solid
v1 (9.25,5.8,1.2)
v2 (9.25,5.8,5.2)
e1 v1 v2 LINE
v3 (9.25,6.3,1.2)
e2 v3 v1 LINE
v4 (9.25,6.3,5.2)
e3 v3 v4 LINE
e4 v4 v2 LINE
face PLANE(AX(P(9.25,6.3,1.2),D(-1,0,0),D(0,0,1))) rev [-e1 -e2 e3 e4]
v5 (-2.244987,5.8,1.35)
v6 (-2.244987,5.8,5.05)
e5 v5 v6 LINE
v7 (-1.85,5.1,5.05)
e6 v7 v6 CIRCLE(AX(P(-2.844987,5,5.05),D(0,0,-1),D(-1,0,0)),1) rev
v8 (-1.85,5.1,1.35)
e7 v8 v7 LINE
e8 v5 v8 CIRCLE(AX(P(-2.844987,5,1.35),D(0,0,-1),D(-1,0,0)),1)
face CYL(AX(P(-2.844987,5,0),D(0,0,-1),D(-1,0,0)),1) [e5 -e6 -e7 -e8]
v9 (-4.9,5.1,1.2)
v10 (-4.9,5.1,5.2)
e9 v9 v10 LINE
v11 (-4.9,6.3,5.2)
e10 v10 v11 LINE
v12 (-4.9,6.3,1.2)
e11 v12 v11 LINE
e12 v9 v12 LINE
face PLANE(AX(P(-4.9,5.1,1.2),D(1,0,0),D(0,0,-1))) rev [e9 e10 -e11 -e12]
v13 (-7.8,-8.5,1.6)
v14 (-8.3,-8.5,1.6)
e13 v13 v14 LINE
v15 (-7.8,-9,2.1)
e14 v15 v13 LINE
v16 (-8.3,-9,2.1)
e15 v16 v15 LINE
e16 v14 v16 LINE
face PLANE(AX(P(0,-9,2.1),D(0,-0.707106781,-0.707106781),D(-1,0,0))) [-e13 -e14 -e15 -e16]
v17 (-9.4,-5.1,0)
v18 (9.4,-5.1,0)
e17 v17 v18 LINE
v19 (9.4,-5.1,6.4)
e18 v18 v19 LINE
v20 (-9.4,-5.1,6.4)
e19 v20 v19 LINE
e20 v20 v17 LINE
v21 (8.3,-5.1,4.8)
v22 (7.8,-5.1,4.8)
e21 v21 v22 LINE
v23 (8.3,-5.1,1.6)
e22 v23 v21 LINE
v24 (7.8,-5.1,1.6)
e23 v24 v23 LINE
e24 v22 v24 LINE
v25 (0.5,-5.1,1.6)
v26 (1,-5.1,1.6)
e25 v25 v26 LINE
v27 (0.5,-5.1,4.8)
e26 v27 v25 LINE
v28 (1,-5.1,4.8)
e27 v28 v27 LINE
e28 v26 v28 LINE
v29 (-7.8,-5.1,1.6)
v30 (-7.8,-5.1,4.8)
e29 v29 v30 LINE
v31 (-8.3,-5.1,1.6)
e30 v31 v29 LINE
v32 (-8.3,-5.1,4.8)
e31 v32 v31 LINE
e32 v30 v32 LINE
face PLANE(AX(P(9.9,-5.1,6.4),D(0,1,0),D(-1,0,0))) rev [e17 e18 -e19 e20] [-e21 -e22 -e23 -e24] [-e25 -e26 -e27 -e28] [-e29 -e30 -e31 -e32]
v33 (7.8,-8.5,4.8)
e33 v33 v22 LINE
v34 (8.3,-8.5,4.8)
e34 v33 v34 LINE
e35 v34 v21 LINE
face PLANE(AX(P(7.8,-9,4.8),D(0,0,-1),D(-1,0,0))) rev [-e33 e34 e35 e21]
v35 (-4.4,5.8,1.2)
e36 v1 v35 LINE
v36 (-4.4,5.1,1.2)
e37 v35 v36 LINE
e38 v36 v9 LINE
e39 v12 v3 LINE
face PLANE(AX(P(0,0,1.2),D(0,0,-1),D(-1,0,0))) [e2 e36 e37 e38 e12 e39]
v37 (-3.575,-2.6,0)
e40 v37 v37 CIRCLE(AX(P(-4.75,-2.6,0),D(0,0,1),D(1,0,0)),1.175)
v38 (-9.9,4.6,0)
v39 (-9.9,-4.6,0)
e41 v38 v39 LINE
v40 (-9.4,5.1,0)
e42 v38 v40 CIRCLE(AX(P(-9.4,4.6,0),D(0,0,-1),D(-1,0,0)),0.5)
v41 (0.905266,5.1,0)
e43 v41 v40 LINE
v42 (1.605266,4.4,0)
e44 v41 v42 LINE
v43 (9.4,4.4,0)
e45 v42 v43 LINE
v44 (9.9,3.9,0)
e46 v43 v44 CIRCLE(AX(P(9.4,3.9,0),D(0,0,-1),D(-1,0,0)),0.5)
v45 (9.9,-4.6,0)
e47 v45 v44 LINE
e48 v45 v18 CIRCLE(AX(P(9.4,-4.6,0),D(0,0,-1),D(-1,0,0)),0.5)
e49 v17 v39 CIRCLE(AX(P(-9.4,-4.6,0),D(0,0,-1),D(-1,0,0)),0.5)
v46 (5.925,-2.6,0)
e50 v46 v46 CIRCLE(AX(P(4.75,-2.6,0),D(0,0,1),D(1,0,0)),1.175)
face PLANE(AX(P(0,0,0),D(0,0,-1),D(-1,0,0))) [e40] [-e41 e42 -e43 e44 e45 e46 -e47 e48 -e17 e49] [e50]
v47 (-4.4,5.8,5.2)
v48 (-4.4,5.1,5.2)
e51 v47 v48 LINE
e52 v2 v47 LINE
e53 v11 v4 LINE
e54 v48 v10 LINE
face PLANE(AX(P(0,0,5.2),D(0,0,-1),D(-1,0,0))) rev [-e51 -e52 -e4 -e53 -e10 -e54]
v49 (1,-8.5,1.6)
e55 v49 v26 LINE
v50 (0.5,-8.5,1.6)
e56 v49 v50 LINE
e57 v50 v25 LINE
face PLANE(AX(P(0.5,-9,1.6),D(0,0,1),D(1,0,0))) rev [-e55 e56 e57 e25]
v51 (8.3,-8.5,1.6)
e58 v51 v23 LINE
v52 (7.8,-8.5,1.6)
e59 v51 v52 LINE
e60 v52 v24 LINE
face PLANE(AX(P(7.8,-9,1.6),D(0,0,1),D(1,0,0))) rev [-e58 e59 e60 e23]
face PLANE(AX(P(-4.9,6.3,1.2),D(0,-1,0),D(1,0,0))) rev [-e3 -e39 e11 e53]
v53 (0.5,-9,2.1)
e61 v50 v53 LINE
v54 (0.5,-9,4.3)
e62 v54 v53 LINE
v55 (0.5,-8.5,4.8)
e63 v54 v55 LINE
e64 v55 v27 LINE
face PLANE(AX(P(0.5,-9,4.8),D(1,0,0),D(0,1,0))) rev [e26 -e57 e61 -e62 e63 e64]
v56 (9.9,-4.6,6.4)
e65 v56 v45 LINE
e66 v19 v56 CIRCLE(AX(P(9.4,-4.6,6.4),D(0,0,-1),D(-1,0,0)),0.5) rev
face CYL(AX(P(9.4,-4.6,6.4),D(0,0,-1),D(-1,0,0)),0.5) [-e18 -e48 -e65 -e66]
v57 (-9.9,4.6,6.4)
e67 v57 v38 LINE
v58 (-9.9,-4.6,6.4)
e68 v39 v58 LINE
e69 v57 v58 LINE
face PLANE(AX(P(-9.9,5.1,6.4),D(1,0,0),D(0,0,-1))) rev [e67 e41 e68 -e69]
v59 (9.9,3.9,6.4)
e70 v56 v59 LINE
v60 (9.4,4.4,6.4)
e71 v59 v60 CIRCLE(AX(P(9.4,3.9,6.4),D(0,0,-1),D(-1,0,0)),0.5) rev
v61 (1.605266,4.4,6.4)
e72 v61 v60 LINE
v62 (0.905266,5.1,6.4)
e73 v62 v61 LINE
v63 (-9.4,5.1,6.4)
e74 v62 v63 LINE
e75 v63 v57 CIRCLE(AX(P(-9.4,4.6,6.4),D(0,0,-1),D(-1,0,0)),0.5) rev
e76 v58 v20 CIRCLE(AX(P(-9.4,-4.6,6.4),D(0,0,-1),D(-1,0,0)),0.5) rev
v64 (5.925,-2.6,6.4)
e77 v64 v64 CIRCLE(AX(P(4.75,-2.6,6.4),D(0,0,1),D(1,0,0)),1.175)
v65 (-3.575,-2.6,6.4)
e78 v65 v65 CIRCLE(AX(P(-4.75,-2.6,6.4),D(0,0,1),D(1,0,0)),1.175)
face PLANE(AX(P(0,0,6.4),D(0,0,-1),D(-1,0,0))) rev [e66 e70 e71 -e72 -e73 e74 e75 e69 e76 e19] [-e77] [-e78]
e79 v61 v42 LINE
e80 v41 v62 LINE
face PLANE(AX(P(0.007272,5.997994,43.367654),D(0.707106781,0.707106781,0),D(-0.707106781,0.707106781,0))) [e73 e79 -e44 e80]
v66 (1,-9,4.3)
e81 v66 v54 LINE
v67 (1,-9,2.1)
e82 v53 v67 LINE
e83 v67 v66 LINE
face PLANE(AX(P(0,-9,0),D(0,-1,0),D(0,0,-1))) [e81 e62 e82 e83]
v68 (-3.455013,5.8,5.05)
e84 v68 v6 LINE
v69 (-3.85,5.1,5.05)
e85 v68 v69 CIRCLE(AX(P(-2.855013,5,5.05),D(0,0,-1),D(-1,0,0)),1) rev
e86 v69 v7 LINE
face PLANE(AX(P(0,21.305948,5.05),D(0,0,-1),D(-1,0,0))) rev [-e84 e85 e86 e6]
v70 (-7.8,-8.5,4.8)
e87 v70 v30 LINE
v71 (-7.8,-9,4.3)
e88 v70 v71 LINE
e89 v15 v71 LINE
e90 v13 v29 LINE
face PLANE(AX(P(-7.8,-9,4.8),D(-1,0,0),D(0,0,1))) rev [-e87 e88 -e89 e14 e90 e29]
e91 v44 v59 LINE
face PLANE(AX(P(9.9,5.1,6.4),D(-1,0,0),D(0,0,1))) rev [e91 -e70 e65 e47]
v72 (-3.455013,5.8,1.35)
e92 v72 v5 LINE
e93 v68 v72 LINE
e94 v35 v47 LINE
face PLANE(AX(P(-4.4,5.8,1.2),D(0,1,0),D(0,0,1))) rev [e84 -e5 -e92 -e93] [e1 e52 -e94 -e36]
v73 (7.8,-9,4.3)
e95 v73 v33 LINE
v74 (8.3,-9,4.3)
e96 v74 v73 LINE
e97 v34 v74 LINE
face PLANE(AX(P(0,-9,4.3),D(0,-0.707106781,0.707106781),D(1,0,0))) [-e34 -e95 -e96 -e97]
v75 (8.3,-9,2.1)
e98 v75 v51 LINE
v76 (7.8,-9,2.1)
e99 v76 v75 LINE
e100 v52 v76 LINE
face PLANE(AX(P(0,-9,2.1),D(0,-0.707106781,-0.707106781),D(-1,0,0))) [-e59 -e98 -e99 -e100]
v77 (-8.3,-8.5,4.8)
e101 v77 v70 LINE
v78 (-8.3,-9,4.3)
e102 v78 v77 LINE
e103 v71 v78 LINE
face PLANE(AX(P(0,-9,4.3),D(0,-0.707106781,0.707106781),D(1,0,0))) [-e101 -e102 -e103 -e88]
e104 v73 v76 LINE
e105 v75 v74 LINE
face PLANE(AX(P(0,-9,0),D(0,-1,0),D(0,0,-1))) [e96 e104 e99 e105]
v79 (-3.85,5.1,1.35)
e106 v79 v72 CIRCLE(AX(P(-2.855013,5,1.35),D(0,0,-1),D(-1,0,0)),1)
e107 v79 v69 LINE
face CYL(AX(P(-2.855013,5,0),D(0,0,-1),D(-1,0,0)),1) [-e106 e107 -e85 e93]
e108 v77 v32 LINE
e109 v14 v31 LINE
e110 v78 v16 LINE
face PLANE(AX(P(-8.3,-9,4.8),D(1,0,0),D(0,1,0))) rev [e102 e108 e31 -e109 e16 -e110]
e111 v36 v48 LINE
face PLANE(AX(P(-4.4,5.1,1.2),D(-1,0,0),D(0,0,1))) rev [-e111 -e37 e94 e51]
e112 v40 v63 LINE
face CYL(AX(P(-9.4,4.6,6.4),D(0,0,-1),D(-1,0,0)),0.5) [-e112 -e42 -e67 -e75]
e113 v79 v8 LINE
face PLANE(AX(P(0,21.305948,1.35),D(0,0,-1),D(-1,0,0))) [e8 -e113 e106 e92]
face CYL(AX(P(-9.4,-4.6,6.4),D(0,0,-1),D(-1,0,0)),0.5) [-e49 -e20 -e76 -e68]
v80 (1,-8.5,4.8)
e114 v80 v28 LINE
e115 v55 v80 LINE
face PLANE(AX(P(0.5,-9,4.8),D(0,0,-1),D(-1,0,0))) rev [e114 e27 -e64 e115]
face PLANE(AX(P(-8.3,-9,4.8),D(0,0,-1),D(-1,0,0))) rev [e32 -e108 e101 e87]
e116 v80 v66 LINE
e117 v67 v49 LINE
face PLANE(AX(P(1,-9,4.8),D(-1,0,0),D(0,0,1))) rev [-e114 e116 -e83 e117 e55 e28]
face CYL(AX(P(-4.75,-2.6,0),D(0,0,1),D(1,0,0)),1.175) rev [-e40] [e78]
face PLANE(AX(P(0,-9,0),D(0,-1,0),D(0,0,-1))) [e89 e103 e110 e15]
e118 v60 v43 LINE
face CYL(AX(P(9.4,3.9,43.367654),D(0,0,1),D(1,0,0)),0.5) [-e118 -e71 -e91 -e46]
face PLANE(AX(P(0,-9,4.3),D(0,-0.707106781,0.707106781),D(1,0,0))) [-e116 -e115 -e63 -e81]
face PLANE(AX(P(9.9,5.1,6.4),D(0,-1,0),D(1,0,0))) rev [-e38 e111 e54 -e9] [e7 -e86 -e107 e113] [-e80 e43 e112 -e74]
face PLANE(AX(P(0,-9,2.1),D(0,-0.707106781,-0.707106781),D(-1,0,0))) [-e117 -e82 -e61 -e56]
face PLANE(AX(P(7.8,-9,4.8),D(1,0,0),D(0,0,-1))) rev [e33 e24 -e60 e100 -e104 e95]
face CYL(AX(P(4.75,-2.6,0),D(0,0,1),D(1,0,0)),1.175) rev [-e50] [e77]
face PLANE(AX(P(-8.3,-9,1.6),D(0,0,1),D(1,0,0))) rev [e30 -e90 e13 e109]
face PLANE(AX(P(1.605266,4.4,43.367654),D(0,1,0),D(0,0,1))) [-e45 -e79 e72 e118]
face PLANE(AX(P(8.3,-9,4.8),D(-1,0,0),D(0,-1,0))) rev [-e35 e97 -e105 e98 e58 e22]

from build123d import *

# Parameters (mm, degrees)
SKETCH_1_W               = 19.8
SKETCH_1_H               = 10.2
EXTRUDE_1_DEPTH          = 6.4
CUT_EXTRUDE_1_DEPTH      = 13.844454056
CUT_EXTRUDE_1_DEPTH_BACK = 13.844454056
SKETCH_3_R               = 1.175
CUT_EXTRUDE_2_DEPTH      = 13.844454056
SKETCH_4_W               = 2
SKETCH_4_H               = 3.7
EXTRUDE_2_DEPTH          = 0.9
FILLET_2_R               = 0.5
FILLET_3_R               = 1
SKETCH_6_W               = 0.5
SKETCH_6_H               = 3.2
EXTRUDE_3_DEPTH          = 3.9
CHAMFER_1_SIZE           = 0.5
EXTRUDE_4_DEPTH          = 2


with BuildPart() as part:
    # 草图1 → 凸台-拉伸1 (new body)
    with BuildSketch(Plane.XY):
        Rectangle(SKETCH_1_W, SKETCH_1_H)
    extrude(amount=EXTRUDE_1_DEPTH)

    # 草图2 → 切除-拉伸1 (cut, two sides: drawn at the far end of the back side and taken through both)
    with BuildSketch(Plane.XY.offset(6.4).offset(-CUT_EXTRUDE_1_DEPTH_BACK)):
        Polygon((9.9, 5.1), (0.905266145, 5.1), (1.605266145, 4.4), (9.9, 4.4), align=None)
    extrude(amount=CUT_EXTRUDE_1_DEPTH + CUT_EXTRUDE_1_DEPTH_BACK, mode=Mode.SUBTRACT)

    # 草图3 → 切除-拉伸2 (cut, through all)
    with BuildSketch(Plane.XY.offset(6.4)):
        with Locations((-4.75, -2.6)):
            Circle(SKETCH_3_R)
        with Locations((4.75, -2.6)):
            Circle(SKETCH_3_R)
    extrude(amount=-CUT_EXTRUDE_2_DEPTH, mode=Mode.SUBTRACT)

    # 草图4 → 凸台-拉伸2 (add)
    with BuildSketch(Plane(origin=(0, 5.1, 0), x_dir=(1, 0, 0), z_dir=(0, 1, 0))):
        with Locations((-2.85, -3.2)):
            Rectangle(SKETCH_4_W, SKETCH_4_H)
    extrude(amount=EXTRUDE_2_DEPTH)

    # 圆角2
    fillet_2_edges = [part.edges().sort_by_distance(p)[0] for p in [
        (9.9, 4.4, 3.2),
        (-9.9, 5.1, 3.2),
        (9.9, -5.1, 3.2),
        (-9.9, -5.1, 3.2),
    ]]
    fillet(fillet_2_edges, radius=FILLET_2_R)

    # 圆角3
    # the kernel refuses this fillet: 1 mm, written as the material it takes off along each edge
    with BuildSketch(Plane(origin=(-1.85, 6, -1.137468593), x_dir=(0, -1, 0), z_dir=(0, 0, 1)), Plane(origin=(-3.85, 6, 7.537468593), x_dir=(0, -1, 0), z_dir=(0, 0, -1))) as fillet_3_piece_1:
        with BuildLine():
            CenterArc((1, -0.994987437), FILLET_3_R, 95.739170477, 84.260829523)
            Line((0, -0.994987437), (-0.02, -0.994987437))
            Line((-0.02, -0.994987437), (-0.02, 0))
            Line((-0.02, 0), (0, 0.02))
            ThreePointArc((0, 0.02), (0.45, 0.02), (0.898, 0.019899749))
            Line((0.898, 0.019899749), (0.9, 0))
        make_face()
    extrude(amount=8.674937186, mode=Mode.SUBTRACT)

    # 草图6 → 凸台-拉伸3 (add)
    with BuildSketch(Plane.XZ.offset(5.1)):
        with Locations((-8.05, 3.2)):
            Rectangle(SKETCH_6_W, SKETCH_6_H)
        with Locations((0.75, 3.2)):
            Rectangle(SKETCH_6_W, SKETCH_6_H)
        with Locations((8.05, 3.2)):
            Rectangle(SKETCH_6_W, SKETCH_6_H)
    extrude(amount=EXTRUDE_3_DEPTH)

    # 倒角1
    chamfer_1_edges = [part.edges().sort_by_distance(p)[0] for p in [
        (0.75, -9, 4.8),
        (0.75, -9, 1.6),
        (8.05, -9, 4.8),
        (8.05, -9, 1.6),
        (-8.05, -9, 4.8),
        (-8.05, -9, 1.6),
    ]]
    chamfer(chamfer_1_edges, length=CHAMFER_1_SIZE)

    # 草图7 → 凸台-拉伸4 (add, symmetric)
    with BuildSketch(Plane(origin=(0, 0, 3.2), x_dir=(-1, 0, 0), z_dir=(0, 0, -1))):
        Polygon((4.9, 5.1), (4.9, 6.3), (-9.25, 6.3), (-9.25, 5.8), (4.4, 5.8), (4.4, 5.1), align=None)
    extrude(amount=EXTRUDE_4_DEPTH, both=True)


solid = part.part
